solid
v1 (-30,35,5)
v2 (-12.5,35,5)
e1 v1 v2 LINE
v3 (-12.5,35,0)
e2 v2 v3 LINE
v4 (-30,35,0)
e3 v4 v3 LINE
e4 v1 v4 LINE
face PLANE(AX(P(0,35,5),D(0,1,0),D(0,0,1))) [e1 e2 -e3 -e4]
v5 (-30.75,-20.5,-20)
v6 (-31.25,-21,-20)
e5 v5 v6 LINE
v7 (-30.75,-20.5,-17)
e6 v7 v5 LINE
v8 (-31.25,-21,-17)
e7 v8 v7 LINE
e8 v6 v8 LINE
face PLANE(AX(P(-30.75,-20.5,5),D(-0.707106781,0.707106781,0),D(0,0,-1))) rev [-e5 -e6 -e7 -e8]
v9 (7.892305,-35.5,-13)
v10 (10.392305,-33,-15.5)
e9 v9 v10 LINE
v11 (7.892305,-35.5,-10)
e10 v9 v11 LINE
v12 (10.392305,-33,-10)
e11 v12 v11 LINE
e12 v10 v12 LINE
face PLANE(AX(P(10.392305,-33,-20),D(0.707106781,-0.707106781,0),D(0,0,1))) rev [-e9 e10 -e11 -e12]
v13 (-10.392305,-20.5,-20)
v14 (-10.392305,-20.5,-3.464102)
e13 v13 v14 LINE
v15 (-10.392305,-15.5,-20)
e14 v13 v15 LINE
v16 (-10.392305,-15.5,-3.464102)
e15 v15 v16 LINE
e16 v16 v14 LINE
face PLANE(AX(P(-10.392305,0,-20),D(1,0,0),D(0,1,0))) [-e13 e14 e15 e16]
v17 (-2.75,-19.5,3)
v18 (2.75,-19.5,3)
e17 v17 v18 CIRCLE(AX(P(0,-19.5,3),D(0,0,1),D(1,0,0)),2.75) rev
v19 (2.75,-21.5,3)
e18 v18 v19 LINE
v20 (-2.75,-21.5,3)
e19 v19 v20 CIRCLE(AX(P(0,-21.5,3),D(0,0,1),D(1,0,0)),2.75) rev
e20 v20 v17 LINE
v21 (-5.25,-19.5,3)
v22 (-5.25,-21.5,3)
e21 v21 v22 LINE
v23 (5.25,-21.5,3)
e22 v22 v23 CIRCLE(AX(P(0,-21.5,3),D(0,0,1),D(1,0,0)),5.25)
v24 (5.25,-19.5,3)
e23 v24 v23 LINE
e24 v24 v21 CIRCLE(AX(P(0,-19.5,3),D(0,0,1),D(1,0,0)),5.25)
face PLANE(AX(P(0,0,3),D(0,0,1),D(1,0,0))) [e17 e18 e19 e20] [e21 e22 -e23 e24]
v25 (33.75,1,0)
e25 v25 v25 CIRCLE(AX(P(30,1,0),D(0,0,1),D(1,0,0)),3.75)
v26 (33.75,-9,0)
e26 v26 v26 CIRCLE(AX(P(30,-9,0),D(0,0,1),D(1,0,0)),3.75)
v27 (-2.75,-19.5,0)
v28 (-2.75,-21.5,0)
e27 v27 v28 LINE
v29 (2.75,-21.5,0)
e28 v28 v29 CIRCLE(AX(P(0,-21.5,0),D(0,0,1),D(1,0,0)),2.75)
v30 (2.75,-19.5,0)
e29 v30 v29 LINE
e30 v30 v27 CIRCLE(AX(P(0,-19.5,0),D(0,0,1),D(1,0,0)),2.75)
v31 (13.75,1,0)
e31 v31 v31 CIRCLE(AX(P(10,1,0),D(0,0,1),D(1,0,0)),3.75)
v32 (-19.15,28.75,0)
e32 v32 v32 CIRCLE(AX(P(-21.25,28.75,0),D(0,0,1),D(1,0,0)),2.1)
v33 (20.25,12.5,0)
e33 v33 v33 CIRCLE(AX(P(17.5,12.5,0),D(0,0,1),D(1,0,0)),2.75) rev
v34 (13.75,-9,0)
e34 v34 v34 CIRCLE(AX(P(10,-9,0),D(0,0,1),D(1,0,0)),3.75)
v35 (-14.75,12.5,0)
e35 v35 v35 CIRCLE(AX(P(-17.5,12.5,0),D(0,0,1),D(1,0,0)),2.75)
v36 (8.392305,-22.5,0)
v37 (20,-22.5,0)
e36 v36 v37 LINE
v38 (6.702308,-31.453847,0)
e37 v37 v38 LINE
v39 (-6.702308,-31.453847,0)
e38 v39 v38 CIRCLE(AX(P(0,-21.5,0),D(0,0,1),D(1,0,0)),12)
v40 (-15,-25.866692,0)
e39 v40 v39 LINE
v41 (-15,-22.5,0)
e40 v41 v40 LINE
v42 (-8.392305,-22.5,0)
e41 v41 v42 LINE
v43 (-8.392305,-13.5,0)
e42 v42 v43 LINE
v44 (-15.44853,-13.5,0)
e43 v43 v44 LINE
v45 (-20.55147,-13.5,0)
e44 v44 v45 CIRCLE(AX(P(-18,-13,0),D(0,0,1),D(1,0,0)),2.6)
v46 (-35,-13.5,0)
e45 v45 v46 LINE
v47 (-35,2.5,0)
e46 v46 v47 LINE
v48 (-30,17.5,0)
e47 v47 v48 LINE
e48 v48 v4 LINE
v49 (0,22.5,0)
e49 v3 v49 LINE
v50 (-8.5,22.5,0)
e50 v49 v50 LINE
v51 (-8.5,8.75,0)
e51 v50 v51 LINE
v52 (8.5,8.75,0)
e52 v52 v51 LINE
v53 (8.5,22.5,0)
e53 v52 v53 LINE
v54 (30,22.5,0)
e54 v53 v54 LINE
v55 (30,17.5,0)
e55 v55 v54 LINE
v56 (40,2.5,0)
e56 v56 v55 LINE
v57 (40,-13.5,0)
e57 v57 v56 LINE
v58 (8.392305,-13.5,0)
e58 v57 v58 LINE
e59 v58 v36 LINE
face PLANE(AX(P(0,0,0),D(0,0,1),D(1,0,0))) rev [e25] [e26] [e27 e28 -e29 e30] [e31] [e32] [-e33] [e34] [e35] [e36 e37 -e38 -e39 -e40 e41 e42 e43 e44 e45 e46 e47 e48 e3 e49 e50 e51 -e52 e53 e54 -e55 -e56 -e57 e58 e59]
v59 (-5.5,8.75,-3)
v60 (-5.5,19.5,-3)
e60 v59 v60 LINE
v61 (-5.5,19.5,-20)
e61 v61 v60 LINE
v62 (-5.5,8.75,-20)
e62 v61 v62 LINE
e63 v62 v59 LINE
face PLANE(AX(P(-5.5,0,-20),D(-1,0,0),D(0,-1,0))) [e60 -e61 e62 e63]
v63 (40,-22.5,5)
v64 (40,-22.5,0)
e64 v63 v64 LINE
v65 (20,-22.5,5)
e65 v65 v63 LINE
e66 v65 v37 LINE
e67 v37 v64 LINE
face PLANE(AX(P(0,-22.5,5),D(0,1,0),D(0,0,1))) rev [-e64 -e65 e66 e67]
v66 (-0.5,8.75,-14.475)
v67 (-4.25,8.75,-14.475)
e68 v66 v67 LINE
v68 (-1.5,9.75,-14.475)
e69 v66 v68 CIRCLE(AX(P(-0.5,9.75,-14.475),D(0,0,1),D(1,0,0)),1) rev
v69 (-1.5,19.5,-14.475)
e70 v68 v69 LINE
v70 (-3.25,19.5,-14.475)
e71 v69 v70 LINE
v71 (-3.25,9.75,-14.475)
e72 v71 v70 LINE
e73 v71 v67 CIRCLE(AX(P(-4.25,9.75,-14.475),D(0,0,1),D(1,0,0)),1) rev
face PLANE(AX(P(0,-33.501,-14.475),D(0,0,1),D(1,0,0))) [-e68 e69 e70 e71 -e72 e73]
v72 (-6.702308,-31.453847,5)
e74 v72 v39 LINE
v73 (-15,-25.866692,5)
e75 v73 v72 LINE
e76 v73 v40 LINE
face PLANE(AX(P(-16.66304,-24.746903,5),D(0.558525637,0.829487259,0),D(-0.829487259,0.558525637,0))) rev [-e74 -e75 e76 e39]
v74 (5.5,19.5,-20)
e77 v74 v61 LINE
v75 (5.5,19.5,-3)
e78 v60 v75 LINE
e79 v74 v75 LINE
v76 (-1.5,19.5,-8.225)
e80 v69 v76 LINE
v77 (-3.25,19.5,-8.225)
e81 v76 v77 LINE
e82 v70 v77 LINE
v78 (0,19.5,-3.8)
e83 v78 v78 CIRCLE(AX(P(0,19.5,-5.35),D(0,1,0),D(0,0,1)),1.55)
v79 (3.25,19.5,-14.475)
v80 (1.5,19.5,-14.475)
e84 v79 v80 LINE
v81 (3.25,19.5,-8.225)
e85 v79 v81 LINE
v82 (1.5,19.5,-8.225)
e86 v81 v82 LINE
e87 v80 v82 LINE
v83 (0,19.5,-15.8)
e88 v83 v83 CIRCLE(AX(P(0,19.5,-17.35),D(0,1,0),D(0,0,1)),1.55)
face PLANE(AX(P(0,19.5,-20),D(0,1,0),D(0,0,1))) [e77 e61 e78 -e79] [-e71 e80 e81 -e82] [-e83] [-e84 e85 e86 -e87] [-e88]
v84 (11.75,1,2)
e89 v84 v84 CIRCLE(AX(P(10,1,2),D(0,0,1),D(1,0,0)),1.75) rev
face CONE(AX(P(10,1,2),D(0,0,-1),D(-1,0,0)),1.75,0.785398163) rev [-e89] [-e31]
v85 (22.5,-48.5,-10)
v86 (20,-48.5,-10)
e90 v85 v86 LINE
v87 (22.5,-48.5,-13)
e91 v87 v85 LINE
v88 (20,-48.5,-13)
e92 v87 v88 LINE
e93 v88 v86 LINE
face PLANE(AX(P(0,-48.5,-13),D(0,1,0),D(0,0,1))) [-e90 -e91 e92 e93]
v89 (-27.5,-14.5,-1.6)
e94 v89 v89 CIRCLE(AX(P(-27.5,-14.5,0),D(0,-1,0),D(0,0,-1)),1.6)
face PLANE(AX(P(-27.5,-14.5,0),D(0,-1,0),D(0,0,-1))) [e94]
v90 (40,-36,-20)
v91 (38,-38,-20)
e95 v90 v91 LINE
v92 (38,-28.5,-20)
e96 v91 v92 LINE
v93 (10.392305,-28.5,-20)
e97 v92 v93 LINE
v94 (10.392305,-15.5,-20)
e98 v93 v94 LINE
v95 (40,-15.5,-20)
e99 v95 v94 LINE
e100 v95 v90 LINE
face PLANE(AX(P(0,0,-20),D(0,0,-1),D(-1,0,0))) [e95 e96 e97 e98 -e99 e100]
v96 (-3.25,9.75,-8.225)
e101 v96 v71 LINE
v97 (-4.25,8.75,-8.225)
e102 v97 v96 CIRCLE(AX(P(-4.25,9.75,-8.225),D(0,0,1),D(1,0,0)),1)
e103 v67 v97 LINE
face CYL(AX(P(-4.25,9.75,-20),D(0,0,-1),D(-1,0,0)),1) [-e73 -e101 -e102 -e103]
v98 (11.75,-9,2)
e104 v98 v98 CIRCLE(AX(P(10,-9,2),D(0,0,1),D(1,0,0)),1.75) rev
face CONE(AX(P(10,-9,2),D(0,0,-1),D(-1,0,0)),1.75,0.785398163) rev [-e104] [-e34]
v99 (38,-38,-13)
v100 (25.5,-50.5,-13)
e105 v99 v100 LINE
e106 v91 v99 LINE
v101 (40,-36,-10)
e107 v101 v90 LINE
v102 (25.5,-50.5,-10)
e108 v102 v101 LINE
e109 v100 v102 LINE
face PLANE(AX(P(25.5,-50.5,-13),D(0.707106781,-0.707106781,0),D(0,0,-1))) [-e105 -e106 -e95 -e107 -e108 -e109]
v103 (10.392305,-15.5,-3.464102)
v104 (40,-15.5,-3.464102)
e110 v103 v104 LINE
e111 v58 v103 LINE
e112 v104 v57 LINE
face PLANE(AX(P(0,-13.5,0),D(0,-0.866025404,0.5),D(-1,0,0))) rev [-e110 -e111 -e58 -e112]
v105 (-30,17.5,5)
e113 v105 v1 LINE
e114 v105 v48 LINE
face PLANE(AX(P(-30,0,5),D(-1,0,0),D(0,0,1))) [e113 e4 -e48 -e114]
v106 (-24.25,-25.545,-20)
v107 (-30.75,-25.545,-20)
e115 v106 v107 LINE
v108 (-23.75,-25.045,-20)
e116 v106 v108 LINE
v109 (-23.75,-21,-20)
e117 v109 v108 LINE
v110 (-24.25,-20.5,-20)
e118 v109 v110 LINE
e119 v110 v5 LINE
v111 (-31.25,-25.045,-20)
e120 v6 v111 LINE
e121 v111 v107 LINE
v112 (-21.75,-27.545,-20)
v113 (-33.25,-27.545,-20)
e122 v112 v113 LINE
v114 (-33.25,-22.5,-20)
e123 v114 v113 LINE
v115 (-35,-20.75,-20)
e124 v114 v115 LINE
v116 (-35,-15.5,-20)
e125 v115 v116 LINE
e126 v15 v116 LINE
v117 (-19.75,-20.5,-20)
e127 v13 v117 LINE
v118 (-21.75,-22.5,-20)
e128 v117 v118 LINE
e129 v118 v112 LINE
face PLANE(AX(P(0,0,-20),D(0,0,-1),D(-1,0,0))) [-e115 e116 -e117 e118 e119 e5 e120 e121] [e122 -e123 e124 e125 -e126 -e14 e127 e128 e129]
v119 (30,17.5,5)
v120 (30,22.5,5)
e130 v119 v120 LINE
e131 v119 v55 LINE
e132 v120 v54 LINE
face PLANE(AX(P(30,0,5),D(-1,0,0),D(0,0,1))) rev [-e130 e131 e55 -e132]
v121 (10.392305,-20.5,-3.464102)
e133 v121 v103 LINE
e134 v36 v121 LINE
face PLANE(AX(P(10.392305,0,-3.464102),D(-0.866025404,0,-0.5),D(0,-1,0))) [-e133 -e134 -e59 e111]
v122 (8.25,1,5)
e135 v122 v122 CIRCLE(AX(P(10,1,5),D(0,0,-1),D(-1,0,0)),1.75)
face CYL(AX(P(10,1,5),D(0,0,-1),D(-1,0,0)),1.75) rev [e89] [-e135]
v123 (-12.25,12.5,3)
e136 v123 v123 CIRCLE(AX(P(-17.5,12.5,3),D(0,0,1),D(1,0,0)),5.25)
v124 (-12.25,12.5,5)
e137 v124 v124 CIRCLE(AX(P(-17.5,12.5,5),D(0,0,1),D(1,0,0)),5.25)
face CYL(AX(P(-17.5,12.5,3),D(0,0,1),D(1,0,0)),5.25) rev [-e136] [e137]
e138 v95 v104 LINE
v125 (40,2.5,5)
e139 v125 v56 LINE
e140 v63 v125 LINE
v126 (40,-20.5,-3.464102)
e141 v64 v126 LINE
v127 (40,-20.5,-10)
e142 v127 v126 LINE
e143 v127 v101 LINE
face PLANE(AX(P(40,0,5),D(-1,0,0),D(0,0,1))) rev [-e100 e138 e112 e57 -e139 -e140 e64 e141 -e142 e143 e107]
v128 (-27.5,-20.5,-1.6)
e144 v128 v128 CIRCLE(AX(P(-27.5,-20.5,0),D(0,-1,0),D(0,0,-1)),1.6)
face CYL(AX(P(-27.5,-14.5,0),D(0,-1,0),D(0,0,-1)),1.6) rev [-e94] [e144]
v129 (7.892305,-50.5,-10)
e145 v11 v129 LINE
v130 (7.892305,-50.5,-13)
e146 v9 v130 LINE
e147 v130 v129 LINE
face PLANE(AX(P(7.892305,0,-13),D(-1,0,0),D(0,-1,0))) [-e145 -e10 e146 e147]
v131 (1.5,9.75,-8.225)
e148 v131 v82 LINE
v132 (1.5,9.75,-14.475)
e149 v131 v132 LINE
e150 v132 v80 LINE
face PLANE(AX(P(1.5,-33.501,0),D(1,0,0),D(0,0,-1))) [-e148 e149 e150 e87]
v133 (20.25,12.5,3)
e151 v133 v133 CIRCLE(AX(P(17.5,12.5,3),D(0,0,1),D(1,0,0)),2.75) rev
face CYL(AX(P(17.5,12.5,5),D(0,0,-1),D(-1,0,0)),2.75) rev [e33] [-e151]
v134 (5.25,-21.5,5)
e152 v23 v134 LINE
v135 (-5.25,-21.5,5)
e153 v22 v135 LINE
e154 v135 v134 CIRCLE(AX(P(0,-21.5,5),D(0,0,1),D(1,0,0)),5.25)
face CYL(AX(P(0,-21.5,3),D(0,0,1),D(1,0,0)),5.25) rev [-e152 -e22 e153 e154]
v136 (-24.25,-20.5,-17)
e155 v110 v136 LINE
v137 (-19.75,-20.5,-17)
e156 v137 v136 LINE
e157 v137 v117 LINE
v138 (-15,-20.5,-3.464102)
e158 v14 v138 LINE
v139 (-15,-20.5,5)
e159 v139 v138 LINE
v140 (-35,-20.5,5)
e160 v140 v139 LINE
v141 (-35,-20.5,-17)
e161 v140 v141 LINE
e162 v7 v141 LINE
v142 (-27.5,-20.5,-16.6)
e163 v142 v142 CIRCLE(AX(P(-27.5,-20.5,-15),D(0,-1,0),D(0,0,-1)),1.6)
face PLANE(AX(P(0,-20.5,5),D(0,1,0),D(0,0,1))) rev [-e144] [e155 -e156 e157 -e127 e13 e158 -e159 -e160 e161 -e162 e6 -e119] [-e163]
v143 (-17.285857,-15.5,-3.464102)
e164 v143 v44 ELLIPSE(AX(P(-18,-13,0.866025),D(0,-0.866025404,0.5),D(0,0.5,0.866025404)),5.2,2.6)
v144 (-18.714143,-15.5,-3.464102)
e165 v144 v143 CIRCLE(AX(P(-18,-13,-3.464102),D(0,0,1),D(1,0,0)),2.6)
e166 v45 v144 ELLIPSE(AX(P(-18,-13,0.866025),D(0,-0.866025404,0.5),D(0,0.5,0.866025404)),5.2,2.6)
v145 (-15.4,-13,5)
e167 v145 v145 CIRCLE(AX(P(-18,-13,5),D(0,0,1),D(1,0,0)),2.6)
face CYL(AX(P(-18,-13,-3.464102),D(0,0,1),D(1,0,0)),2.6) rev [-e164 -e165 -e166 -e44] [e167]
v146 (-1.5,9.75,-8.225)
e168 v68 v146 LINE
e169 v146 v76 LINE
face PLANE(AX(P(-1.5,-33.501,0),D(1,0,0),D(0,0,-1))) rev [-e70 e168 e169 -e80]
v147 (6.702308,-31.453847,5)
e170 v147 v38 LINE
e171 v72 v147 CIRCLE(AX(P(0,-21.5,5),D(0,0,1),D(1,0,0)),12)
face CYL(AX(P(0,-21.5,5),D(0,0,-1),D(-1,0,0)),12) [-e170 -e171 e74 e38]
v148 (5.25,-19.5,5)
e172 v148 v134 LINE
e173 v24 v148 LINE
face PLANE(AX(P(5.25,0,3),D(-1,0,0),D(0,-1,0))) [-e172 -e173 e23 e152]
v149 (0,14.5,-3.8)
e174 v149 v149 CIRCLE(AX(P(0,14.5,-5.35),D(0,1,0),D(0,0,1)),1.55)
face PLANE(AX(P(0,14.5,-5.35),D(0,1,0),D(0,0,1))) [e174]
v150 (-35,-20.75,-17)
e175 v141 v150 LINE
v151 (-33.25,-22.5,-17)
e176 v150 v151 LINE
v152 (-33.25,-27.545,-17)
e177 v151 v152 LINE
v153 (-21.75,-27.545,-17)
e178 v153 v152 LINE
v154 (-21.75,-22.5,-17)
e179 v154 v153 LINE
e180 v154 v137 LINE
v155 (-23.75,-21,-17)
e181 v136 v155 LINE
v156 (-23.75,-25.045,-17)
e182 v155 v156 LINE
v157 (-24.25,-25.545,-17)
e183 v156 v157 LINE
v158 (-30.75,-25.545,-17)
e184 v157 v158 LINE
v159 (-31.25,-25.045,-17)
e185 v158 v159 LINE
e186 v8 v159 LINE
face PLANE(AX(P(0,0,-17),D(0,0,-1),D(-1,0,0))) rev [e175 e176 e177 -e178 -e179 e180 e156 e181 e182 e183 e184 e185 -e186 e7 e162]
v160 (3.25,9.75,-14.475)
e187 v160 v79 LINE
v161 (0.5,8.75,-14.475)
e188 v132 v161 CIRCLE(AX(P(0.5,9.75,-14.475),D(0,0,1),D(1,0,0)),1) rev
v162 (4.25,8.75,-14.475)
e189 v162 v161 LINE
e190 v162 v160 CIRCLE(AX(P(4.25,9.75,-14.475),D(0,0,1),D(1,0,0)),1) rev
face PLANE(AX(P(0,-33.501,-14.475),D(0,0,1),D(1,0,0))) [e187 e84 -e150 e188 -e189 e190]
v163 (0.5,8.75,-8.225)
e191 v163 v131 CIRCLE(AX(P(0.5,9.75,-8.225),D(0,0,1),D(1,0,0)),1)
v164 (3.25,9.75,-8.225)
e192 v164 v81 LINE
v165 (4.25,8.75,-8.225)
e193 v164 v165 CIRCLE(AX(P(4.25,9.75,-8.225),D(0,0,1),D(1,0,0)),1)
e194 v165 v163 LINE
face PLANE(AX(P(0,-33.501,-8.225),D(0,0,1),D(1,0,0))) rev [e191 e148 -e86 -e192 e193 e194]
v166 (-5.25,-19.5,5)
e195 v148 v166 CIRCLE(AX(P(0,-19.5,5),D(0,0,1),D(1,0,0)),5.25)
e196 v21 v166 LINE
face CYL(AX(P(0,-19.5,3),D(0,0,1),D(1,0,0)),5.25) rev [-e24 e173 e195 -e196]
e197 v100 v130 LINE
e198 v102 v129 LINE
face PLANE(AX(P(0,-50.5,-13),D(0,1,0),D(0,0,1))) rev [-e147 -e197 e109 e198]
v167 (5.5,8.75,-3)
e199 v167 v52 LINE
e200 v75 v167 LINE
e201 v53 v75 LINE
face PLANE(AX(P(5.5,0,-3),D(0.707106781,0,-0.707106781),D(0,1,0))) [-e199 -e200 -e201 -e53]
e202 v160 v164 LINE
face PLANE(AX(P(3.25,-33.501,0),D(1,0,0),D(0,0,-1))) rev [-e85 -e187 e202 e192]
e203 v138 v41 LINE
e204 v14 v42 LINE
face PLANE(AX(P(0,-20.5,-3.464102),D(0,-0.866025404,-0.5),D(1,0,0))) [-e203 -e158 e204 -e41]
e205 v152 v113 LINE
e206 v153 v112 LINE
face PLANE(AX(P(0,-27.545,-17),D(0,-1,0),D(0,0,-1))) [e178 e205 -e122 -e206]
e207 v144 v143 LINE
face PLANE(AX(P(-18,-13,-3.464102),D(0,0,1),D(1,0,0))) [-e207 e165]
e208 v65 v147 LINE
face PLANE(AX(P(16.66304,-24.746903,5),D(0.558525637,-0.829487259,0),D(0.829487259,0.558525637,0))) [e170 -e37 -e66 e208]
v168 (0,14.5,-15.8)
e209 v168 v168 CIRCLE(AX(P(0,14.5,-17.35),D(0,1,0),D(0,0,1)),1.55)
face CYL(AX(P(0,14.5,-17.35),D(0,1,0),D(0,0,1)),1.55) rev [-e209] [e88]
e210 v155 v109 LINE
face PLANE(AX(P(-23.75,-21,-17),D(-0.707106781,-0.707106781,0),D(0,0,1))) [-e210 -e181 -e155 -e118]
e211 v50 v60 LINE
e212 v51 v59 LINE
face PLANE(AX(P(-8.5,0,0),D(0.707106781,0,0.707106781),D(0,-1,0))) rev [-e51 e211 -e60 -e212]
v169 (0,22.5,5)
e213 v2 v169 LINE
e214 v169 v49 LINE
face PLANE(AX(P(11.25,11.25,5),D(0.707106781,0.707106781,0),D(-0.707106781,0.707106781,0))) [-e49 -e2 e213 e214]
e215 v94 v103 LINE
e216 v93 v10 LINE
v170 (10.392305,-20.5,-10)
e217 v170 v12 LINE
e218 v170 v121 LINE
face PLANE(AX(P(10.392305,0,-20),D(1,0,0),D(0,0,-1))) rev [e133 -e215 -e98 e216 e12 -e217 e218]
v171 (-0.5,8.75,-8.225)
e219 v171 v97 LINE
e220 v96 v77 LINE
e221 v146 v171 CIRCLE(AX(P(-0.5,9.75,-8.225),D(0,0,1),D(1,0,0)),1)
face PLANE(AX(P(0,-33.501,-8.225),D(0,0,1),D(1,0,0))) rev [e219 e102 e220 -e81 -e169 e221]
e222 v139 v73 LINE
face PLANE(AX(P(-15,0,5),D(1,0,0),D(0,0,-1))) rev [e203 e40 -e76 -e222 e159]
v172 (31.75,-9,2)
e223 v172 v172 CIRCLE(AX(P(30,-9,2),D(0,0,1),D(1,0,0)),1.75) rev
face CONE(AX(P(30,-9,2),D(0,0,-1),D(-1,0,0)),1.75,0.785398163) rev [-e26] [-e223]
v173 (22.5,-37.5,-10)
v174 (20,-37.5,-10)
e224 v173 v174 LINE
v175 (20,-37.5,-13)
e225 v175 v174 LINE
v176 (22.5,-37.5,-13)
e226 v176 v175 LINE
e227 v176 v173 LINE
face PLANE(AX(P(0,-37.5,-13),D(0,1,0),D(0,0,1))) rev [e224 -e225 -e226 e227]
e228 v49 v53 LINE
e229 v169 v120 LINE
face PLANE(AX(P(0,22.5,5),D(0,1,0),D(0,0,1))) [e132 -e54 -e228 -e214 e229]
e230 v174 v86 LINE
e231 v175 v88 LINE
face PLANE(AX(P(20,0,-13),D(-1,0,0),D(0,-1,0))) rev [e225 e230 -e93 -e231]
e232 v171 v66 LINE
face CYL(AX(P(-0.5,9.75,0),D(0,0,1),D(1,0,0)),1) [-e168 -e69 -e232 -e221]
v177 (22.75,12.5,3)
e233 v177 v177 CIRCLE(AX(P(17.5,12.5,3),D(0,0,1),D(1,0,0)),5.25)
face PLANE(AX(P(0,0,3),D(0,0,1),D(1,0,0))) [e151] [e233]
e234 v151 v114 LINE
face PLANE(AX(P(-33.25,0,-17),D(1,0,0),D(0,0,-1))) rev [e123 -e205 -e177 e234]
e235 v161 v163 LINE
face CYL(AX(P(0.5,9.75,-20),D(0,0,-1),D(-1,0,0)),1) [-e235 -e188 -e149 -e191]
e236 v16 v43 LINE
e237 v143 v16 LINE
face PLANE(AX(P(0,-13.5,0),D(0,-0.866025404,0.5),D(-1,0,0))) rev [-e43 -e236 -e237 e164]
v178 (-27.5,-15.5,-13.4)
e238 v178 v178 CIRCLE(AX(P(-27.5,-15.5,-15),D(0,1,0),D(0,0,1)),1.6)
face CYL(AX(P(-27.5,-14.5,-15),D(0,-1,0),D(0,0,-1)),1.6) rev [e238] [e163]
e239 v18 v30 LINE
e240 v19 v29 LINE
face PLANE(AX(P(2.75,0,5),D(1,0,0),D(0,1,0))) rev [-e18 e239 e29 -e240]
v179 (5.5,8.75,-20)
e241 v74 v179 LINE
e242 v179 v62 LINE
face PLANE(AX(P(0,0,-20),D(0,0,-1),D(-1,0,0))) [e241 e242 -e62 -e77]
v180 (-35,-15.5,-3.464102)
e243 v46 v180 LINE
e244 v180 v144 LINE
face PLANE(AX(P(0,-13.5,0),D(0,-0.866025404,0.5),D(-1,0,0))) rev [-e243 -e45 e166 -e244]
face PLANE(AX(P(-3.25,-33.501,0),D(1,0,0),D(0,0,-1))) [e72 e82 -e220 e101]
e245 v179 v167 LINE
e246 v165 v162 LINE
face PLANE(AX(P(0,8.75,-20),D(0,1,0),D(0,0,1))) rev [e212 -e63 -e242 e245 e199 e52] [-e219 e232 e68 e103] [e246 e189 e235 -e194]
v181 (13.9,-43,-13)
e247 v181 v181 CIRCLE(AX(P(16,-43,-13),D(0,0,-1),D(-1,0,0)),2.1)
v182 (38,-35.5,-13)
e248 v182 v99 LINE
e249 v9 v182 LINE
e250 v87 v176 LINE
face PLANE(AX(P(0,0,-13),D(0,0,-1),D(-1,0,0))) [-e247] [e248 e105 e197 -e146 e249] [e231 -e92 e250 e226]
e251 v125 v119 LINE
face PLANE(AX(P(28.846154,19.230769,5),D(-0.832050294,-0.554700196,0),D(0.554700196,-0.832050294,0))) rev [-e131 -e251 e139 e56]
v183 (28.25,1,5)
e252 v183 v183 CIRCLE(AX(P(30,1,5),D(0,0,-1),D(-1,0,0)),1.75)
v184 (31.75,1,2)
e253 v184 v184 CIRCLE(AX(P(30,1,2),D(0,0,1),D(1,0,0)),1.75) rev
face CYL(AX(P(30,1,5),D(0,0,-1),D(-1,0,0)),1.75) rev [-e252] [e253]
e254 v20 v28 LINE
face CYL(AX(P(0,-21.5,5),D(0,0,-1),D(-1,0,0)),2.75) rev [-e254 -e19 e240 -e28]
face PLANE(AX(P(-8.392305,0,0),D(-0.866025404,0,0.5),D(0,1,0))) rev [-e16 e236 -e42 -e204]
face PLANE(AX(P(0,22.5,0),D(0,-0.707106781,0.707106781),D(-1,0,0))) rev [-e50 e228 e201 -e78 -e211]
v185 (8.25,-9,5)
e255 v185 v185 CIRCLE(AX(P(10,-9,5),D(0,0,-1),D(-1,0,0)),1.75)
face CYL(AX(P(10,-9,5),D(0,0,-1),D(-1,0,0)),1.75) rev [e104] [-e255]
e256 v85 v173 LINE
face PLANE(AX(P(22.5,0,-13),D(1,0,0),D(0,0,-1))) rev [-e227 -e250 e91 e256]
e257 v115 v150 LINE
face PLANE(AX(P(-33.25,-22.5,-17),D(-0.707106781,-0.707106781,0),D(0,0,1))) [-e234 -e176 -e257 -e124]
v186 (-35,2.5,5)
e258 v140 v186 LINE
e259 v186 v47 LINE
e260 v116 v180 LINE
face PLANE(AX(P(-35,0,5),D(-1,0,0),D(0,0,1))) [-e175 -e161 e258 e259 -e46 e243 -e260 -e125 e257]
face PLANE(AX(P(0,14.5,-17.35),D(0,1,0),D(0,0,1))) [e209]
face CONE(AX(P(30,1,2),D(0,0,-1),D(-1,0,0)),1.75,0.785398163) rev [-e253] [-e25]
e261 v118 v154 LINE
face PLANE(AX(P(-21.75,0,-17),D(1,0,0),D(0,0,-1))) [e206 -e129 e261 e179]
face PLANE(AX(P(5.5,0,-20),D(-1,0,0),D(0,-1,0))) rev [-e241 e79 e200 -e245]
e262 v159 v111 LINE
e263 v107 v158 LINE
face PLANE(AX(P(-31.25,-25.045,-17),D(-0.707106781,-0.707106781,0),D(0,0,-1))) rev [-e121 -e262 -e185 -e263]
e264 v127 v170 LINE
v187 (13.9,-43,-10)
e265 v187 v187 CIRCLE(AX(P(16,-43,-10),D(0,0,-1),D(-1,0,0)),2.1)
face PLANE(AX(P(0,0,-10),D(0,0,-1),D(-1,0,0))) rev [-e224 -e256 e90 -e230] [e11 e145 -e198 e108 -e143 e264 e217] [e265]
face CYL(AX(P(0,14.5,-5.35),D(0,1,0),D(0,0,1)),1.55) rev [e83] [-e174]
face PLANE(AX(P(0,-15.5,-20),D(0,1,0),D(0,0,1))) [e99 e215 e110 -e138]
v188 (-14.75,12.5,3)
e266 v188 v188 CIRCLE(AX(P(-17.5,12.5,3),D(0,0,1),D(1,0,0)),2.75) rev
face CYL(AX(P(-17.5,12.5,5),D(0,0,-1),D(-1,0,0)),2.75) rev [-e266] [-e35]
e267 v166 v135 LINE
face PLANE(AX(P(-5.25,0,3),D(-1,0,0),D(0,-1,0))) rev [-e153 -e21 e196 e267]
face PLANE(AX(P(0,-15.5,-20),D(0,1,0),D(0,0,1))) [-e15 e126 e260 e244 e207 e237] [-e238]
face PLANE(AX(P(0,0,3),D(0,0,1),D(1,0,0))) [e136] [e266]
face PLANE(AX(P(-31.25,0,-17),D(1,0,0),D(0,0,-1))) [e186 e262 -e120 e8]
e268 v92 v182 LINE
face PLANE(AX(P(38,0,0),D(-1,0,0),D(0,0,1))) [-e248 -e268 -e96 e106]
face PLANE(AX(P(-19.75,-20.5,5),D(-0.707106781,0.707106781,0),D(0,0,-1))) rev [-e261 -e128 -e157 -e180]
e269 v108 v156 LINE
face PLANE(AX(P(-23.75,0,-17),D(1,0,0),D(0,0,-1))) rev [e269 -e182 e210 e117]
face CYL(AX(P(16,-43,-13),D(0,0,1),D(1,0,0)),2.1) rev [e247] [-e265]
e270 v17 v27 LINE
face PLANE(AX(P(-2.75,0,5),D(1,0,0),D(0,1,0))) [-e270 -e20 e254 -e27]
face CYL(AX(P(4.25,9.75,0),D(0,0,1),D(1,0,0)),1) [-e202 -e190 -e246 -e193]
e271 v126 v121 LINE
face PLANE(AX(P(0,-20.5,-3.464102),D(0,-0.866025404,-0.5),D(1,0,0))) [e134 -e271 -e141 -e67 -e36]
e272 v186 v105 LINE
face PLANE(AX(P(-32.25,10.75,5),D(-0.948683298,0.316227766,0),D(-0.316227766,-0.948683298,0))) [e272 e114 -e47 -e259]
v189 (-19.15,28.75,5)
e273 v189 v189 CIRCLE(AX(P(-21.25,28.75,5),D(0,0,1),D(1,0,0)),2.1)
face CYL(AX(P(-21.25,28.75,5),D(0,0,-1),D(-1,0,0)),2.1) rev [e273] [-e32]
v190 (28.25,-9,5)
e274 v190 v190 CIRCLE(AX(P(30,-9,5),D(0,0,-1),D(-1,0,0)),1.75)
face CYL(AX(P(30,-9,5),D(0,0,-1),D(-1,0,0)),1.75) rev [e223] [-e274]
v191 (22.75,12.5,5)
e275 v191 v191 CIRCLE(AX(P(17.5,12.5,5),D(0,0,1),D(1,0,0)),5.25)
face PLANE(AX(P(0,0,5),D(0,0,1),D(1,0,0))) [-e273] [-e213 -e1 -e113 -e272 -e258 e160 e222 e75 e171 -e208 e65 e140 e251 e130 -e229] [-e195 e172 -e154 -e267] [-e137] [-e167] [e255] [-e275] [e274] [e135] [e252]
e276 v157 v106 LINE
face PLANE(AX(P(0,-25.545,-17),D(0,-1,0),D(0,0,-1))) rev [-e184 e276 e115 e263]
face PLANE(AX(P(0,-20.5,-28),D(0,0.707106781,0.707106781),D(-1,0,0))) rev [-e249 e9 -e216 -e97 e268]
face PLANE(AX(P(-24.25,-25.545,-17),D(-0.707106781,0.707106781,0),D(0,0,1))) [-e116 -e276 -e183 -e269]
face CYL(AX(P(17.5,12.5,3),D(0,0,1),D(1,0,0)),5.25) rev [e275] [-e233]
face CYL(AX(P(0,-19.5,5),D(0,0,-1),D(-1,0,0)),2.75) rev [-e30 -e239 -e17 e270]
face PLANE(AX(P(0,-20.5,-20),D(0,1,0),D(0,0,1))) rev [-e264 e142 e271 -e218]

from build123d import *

# Parameters (mm, degrees)
SKETCH_1_R          = 2.75
SKETCH_1_R_2        = 2.1
EXTRUDE_1_DEPTH     = 5
EXTRUDE_START       = 20
SKETCH_2_W          = 11
SKETCH_2_H          = 10.75
EXTRUDE_2_DEPTH     = 20
CHAMFER_1_SIZE      = 2
CHAMFER_1_SIZE2     = 3.464101615
CUT_EXTRUDE_START   = -2
SKETCH_8_R          = 5.25
SKETCH_8_R_2        = 2.75
CUT_EXTRUDE_3_DEPTH = 2
CUT_EXTRUDE_4_REACH = 73.666
SKETCH_9_W          = 1.75
SKETCH_9_H          = 6.25
SKETCH_10_R         = 1.55
CUT_EXTRUDE_5_DEPTH = 8
FILLET_1_R          = 1
CHAMFER_2_SIZE      = 3
SKETCH_11_R         = 1.6
CUT_EXTRUDE_6_DEPTH = 6
EXTRUDE_3_DEPTH     = 3
CHAMFER_3_SIZE      = 2
CHAMFER_4_SIZE      = 0.5
CHAMFER_5_SIZE      = 0.5
EXTRUDE_START_2     = -10
SKETCH_14_W         = 2.5
SKETCH_14_H         = 11
SKETCH_14_R         = 2.1
EXTRUDE_4_DEPTH     = 3
CHAMFER_6_SIZE      = 15
SKETCH_16_R         = 2.6
CUT_EXTRUDE_8_DEPTH = 8.4641
SKETCH_17_R         = 1.75
CUT_EXTRUDE_9_DEPTH = 68.455540914
CHAMFER_7_SIZE      = 2
SKETCH_18_W         = 7
SKETCH_18_H         = 15
EXTRUDE_5_DEPTH     = 2
CHAMFER_9_SIZE      = 2.5
CHAMFER_10_SIZE     = 15


# Some blends are built 0.0001 mm under size
with BuildPart() as part:
    # Эскиз1 → Бобышка-Вытянуть1 (new body)
    with BuildSketch(Plane.XY):
        with BuildLine():
            ThreePointArc((-6.702307645, -31.453847107), (0, -33.5), (6.702307645, -31.453847107))
            Line((6.702307645, -31.453847107), (20, -22.5))
            Line((20, -22.5), (40, -22.5))
            Line((40, -22.5), (40, 2.5))
            Line((40, 2.5), (30, 17.5))
            Line((30, 17.5), (30, 22.5))
            Line((30, 22.5), (0, 22.5))
            Line((0, 22.5), (-12.5, 35))
            Line((-12.5, 35), (-30, 35))
            Line((-30, 35), (-30, 17.5))
            Line((-30, 17.5), (-35, 2.5))
            Line((-35, 2.5), (-35, -20.5))
            Line((-35, -20.5), (-15, -20.5))
            Line((-15, -20.5), (-15, -25.86669208))
            Line((-15, -25.86669208), (-6.702307645, -31.453847107))
        make_face()
        with BuildLine():
            Line((-2.75, -21.5), (-2.75, -19.5))
            ThreePointArc((-2.75, -19.5), (0, -16.75), (2.75, -19.5))
            Line((2.75, -19.5), (2.75, -21.5))
            ThreePointArc((2.75, -21.5), (0, -24.25), (-2.75, -21.5))
        make_face(mode=Mode.SUBTRACT)
        with Locations((-17.5, 12.5)):
            Circle(SKETCH_1_R, mode=Mode.SUBTRACT)
        with Locations((-21.25, 28.75)):
            Circle(SKETCH_1_R_2, mode=Mode.SUBTRACT)
        with Locations((17.5, 12.5)):
            Circle(SKETCH_1_R, mode=Mode.SUBTRACT)
    extrude(amount=EXTRUDE_1_DEPTH)

    # Эскиз2 → Бобышка-Вытянуть2 (add)
    with BuildSketch(Plane(origin=(0, 0, 0), x_dir=(-1, 0, 0), z_dir=(0, 0, -1)).offset(EXTRUDE_START)):
        with Locations((0, 14.125)):
            Rectangle(SKETCH_2_W, SKETCH_2_H)
        with BuildLine():
            Line((35, -15.5), (10.392304845, -15.5))
            ThreePointArc((10.392304845, -15.5), (11.451504073, -17.913489932), (11.958260743, -20.5))
            Line((11.958260743, -20.5), (15, -20.5))
            Line((15, -20.5), (35, -20.5))
            Line((35, -20.5), (35, -15.5))
        make_face()
        with BuildLine():
            ThreePointArc((11.958260743, -20.5), (11.451504073, -17.913489932), (10.392304845, -15.5))
            Line((10.392304845, -15.5), (10.392304845, -20.5))
            Line((10.392304845, -20.5), (11.958260743, -20.5))
        make_face()
        with BuildLine():
            Line((-10.392304845, -20.5), (-10.392304845, -15.5))
            ThreePointArc((-10.392304845, -15.5), (-11.451504073, -17.913489932), (-11.958260743, -20.5))
            Line((-11.958260743, -20.5), (-10.392304845, -20.5))
        make_face()
        with BuildLine():
            Line((-10.392304845, -15.5), (-40, -15.5))
            Line((-40, -15.5), (-40, -20.5))
            Line((-40, -20.5), (-11.958260743, -20.5))
            ThreePointArc((-11.958260743, -20.5), (-11.451504073, -17.913489932), (-10.392304845, -15.5))
        make_face()
    extrude(amount=-EXTRUDE_2_DEPTH)

    # Фаска1
    chamfer_1_edges = [part.edges().sort_by_distance(p)[0] for p in [
        (10.392304845, -18, 0),
        (25.196152423, -20.5, 0),
        (25.196152423, -15.5, 0),
        (-12.696152423, -20.5, 0),
        (-22.696152423, -15.5, 0),
        (-10.392304845, -18, 0),
    ]]
    chamfer_1_side = [part.faces().sort_by_distance(p)[0] for p in [
        (0.373325122, 0.80452147, 0),
    ]]
    chamfer(chamfer_1_edges, length=CHAMFER_1_SIZE, length2=CHAMFER_1_SIZE2, reference=chamfer_1_side[0])

    # Эскиз8 → Вырез-Вытянуть3 (cut)
    # profile 1 of 3: a face of its own
    with BuildSketch(Plane.XY.offset(5).offset(CUT_EXTRUDE_START)):
        with BuildLine():
            ThreePointArc((-5.25, -21.5), (0, -26.75), (5.25, -21.5))
            Line((5.25, -21.5), (5.25, -19.5))
            ThreePointArc((5.25, -19.5), (0, -14.25), (-5.25, -19.5))
            Line((-5.25, -19.5), (-5.25, -21.5))
        make_face()
        with BuildLine():
            Line((2.75, -19.5), (2.75, -21.5))
            ThreePointArc((2.75, -21.5), (0, -24.25), (-2.75, -21.5))
            Line((-2.75, -21.5), (-2.75, -19.5))
            ThreePointArc((-2.75, -19.5), (0, -16.75), (2.75, -19.5))
        make_face(mode=Mode.SUBTRACT)
    # profile 2 of 3: a face of its own
    with BuildSketch(Plane.XY.offset(5).offset(CUT_EXTRUDE_START)):
        with Locations((-17.5, 12.5)):
            Circle(SKETCH_8_R)
        with Locations((-17.5, 12.5)):
            Circle(SKETCH_8_R_2, mode=Mode.SUBTRACT)
    # profile 3 of 3: a face of its own
    with BuildSketch(Plane.XY.offset(5).offset(CUT_EXTRUDE_START)):
        with Locations((17.5, 12.5)):
            Circle(SKETCH_8_R)
        with Locations((17.5, 12.5)):
            Circle(SKETCH_8_R_2, mode=Mode.SUBTRACT)
    extrude(amount=CUT_EXTRUDE_3_DEPTH, mode=Mode.SUBTRACT)

    # Эскиз9 → Вырез-Вытянуть4 (cut, up to next)
    with BuildSketch(Plane(origin=(0, 22.5, 0), x_dir=(1, 0, 0), z_dir=(0, 1, 0)), mode=Mode.PRIVATE) as cut_extrude_4_sk1:
        with Locations((-2.375, 11.35)):
            Rectangle(SKETCH_9_W, SKETCH_9_H)
    cut_extrude_4_tool1 = extrude(cut_extrude_4_sk1.sketch, amount=-CUT_EXTRUDE_4_REACH, mode=Mode.PRIVATE) & part.part
    # Эскиз9 → Вырез-Вытянуть4 (cut, up to next)
    with BuildSketch(Plane(origin=(0, 22.5, 0), x_dir=(1, 0, 0), z_dir=(0, 1, 0)), mode=Mode.PRIVATE) as cut_extrude_4_sk2:
        with Locations((2.375, 11.35)):
            Rectangle(SKETCH_9_W, SKETCH_9_H)
    cut_extrude_4_tool2 = extrude(cut_extrude_4_sk2.sketch, amount=-CUT_EXTRUDE_4_REACH, mode=Mode.PRIVATE) & part.part
    add(cut_extrude_4_tool1.solids().sort_by_distance((-2.375, 22.5, -11.35))[0], mode=Mode.SUBTRACT)
    add(cut_extrude_4_tool2.solids().sort_by_distance((2.375, 22.5, -11.35))[0], mode=Mode.SUBTRACT)

    # Эскиз10 → Вырез-Вытянуть5 (cut)
    with BuildSketch(Plane(origin=(0, 22.5, 0), x_dir=(1, 0, 0), z_dir=(0, 1, 0))):
        with Locations(Location((0, 17.35, 0), (0, 0, 270))):
            Circle(SKETCH_10_R)
        with Locations(Location((0, 5.35, 0), (0, 0, 270))):
            Circle(SKETCH_10_R)
    extrude(amount=-CUT_EXTRUDE_5_DEPTH, mode=Mode.SUBTRACT)

    # Скругление1
    fillet_1_edges = [part.edges().sort_by_distance(p)[0] for p in [
        (-3.25, 8.75, -11.35),
        (-1.5, 8.75, -11.35),
        (3.25, 8.75, -11.35),
        (1.5, 8.75, -11.35),
    ]]
    fillet(fillet_1_edges, radius=FILLET_1_R)

    # Фаска2
    chamfer_2_edges = [part.edges().sort_by_distance(p)[0] for p in [
        (5.5, 14.125, 0),
        (-5.5, 14.125, 0),
        (0, 19.5, 0),
    ]]
    chamfer(chamfer_2_edges, length=CHAMFER_2_SIZE - 0.0001)  # a hair under: the kernel refuses the full size

    # Эскиз11 → Вырез-Вытянуть6 (cut)
    with BuildSketch(Plane.XZ.offset(20.5)):
        with Locations(Location((-27.5, -15, 0), (0, 0, 270))):
            Circle(SKETCH_11_R)
        with Locations(Location((-27.5, 0, 0), (0, 0, 270))):
            Circle(SKETCH_11_R)
    extrude(amount=-CUT_EXTRUDE_6_DEPTH, mode=Mode.SUBTRACT)

    # Эскиз12 → Бобышка-Вытянуть3 (add)
    with BuildSketch(Plane(origin=(0, 0, -20), x_dir=(-1, 0, 0), z_dir=(0, 0, -1))):
        Polygon((23.75, -25.545), (23.75, -20.5), (21.75, -20.5), (21.75, -27.545), (33.25, -27.545), (33.25, -20.5), (31.25, -20.5), (31.25, -25.545), align=None)
    extrude(amount=-EXTRUDE_3_DEPTH)

    # Фаска3
    # the kernel refuses this chamfer: 2 mm, written as the material it adds along each edge
    with BuildSketch(Plane(origin=(-33.25, -20.5, -20), x_dir=(-0.9996219169112968, 0.027495876610585647, 0), z_dir=(0, 0, 1))) as chamfer_3_piece_1_section:
        Polygon((CHAMFER_3_SIZE * 0.999621916911, CHAMFER_3_SIZE * 0.0274958766106), (-CHAMFER_3_SIZE * 0.0274958766106, CHAMFER_3_SIZE * 0.999621916911), (0, 0), align=None)
    chamfer_3_piece_1 = extrude(amount=3, mode=Mode.PRIVATE)
    chamfer_3_piece_1 = split(chamfer_3_piece_1, bisect_by=Plane(origin=(-35, -21.175979667, -18.5), z_dir=(1, 0, 0)), keep=Keep.TOP, mode=Mode.PRIVATE)
    add(chamfer_3_piece_1)
    with BuildSketch(Plane(origin=(-21.75, -20.5, -20), x_dir=(0.9996219169112968, 0.027495876610585647, 0), z_dir=(0, 0, 1))) as chamfer_3_piece_2:
        Polygon((CHAMFER_3_SIZE * 0.999621916911, -CHAMFER_3_SIZE * 0.0274958766106), (-CHAMFER_3_SIZE * 0.0274958766106, -CHAMFER_3_SIZE * 0.999621916911), (0, 0), align=None)
    extrude(amount=3)

    # Фаска4
    chamfer_4_edges = [part.edges().sort_by_distance(p)[0] for p in [
        (-23.75, -20.5, -18.5),
        (-31.25, -20.5, -18.5),
    ]]
    chamfer(chamfer_4_edges, length=CHAMFER_4_SIZE)

    # Фаска5
    chamfer_5_edges = [part.edges().sort_by_distance(p)[0] for p in [
        (-23.75, -25.545, -18.5),
        (-31.25, -25.545, -18.5),
    ]]
    chamfer(chamfer_5_edges, length=CHAMFER_5_SIZE)

    # Эскиз14 → Бобышка-Вытянуть4 (add)
    with BuildSketch(Plane(origin=(0, 0, -20), x_dir=(-1, 0, 0), z_dir=(0, 0, -1)).offset(EXTRUDE_START_2)):
        Polygon((-40, -20.5), (-40, -35.5), (-25.5, -35.5), (-25.5, -50.5), (-7.892304845, -50.5), (-7.892304845, -35.5), (-10.392304845, -35.5), (-10.392304845, -20.5), align=None)
        with Locations((-21.25, -43)):
            Rectangle(SKETCH_14_W, SKETCH_14_H, mode=Mode.SUBTRACT)
        with Locations((-16, -43)):
            Circle(SKETCH_14_R, mode=Mode.SUBTRACT)
    extrude(amount=EXTRUDE_4_DEPTH)

    # Фаска6
    # the kernel refuses this chamfer: 15 mm, written as the material it adds along each edge
    with BuildSketch(Plane(origin=(10.392304845, -20.5, -13), x_dir=(0, 0.027495876610586303, -0.9996219169112966), z_dir=(1, 0, 0))) as chamfer_6_piece_1_section:
        Polygon((CHAMFER_6_SIZE * 0.999621916911, -CHAMFER_6_SIZE * 0.0274958766106), (-CHAMFER_6_SIZE * 0.0274958766106, -CHAMFER_6_SIZE * 0.999621916911), (0, 0), align=None)
    chamfer_6_piece_1 = extrude(amount=29.607695155, mode=Mode.PRIVATE)
    chamfer_6_piece_1 = split(chamfer_6_piece_1, bisect_by=Plane(origin=(17.946152423, -26.478099439, -20), z_dir=(0, 0, 1)), keep=Keep.TOP, mode=Mode.PRIVATE)
    chamfer_6_piece_1 = split(chamfer_6_piece_1, bisect_by=Plane(origin=(25.5, -26.478099439, -15.943264036), z_dir=(-1, 0, 0)), keep=Keep.TOP, mode=Mode.PRIVATE)
    chamfer_6_piece_1 = split(chamfer_6_piece_1, bisect_by=Plane(origin=(17.946152423, -35.5, -15.943264036), z_dir=(0, 1, 0)), keep=Keep.TOP, mode=Mode.PRIVATE)
    add(chamfer_6_piece_1)
    with BuildSketch(Plane(origin=(10.392304845, -20.5, -13), x_dir=(0, 0.027495876610586303, -0.9996219169112966), z_dir=(1, 0, 0))) as chamfer_6_piece_2_section:
        Polygon((CHAMFER_6_SIZE * 0.999621916911, -CHAMFER_6_SIZE * 0.0274958766106), (-CHAMFER_6_SIZE * 0.0274958766106, -CHAMFER_6_SIZE * 0.999621916911), (0, 0), align=None)
    chamfer_6_piece_2 = extrude(amount=29.607695155, mode=Mode.PRIVATE)
    chamfer_6_piece_2 = split(chamfer_6_piece_2, bisect_by=Plane(origin=(32.75, -26.478099439, -20), z_dir=(0, 0, 1)), keep=Keep.TOP, mode=Mode.PRIVATE)
    chamfer_6_piece_2 = split(chamfer_6_piece_2, bisect_by=Plane(origin=(25.5, -26.478099439, -15.943264036), z_dir=(1, 0, 0)), keep=Keep.TOP, mode=Mode.PRIVATE)
    chamfer_6_piece_2 = split(chamfer_6_piece_2, bisect_by=Plane(origin=(32.75, -35.5, -15.943264036), z_dir=(0, 1, 0)), keep=Keep.TOP, mode=Mode.PRIVATE)
    add(chamfer_6_piece_2)

    # Эскиз16 → Вырез-Вытянуть8 (cut)
    with BuildSketch(Plane.XY.offset(5)):
        with Locations((-18, -13)):
            Circle(SKETCH_16_R)
    extrude(amount=-CUT_EXTRUDE_8_DEPTH, mode=Mode.SUBTRACT)

    # Эскиз17 → Вырез-Вытянуть9 (cut, through all)
    with BuildSketch(Plane(origin=(0, 0, 0), x_dir=(-1, 0, 0), z_dir=(0, 0, -1))):
        with Locations((-30, 1)):
            Circle(SKETCH_17_R)
        with Locations((-10, 1)):
            Circle(SKETCH_17_R)
        with Locations((-10, -9)):
            Circle(SKETCH_17_R)
        with Locations((-30, -9)):
            Circle(SKETCH_17_R)
    extrude(amount=-CUT_EXTRUDE_9_DEPTH, mode=Mode.SUBTRACT)

    # Фаска7
    chamfer_7_edges = [part.edges().sort_by_distance(p)[0] for p in [
        (31.75, -9, 0),
        (11.75, -9, 0),
        (11.75, 1, 0),
        (31.75, 1, 0),
    ]]
    chamfer(chamfer_7_edges, length=CHAMFER_7_SIZE)

    # Эскиз18 → Бобышка-Вытянуть5 (add)
    with BuildSketch(Plane(origin=(40, 0, 0), x_dir=(0, 0, -1), z_dir=(1, 0, 0))):
        with Locations((16.5, -28)):
            Rectangle(SKETCH_18_W, SKETCH_18_H)
    extrude(amount=-EXTRUDE_5_DEPTH)

    # Фаска9
    chamfer_9_edges = [part.edges().sort_by_distance(p)[0] for p in [
        (10.392304845, -35.5, -11.5),
    ]]
    chamfer(chamfer_9_edges, length=CHAMFER_9_SIZE - 0.0001)  # a hair under: the kernel refuses the full size

    # Фаска10
    # the kernel refuses this chamfer: 15 mm, written as the material it adds along each edge
    with BuildSketch(Plane(origin=(25.5, -35.5, -10), x_dir=(0.9996219169112968, 0.02749587661058632, 0), z_dir=(0, 0, -1))) as chamfer_10_piece_1_section:
        Polygon((CHAMFER_10_SIZE * 0.999621916911, CHAMFER_10_SIZE * 0.0274958766106), (-CHAMFER_10_SIZE * 0.0274958766106, CHAMFER_10_SIZE * 0.999621916911), (0, 0), align=None)
    chamfer_10_piece_1 = extrude(amount=3, mode=Mode.PRIVATE)
    chamfer_10_piece_1 = split(chamfer_10_piece_1, bisect_by=Plane(origin=(40, -36.201298701, -11.149350649), z_dir=(-1, 0, 0)), keep=Keep.TOP, mode=Mode.PRIVATE)
    add(chamfer_10_piece_1)
    with BuildSketch(Plane(origin=(25.5, -35.5, 28.575244819), x_dir=(0.9996219169112968, 0.02749587661058632, 0), z_dir=(0, 0, -1))) as chamfer_10_piece_2_section:
        Polygon((CHAMFER_10_SIZE * 0.999621916911, CHAMFER_10_SIZE * 0.0274958766106), (-CHAMFER_10_SIZE * 0.0274958766106, CHAMFER_10_SIZE * 0.999621916911), (0, 0), align=None)
    chamfer_10_piece_2 = extrude(amount=80.150489639, mode=Mode.PRIVATE)
    chamfer_10_piece_2 = split(chamfer_10_piece_2, bisect_by=Plane(origin=(38.777777778, -34.180555556, -14.319444444), z_dir=(0, -0.7071067811862648, -0.7071067811868302)), keep=Keep.TOP, mode=Mode.PRIVATE)
    chamfer_10_piece_2 = split(chamfer_10_piece_2, bisect_by=Plane(origin=(38, -36.361111111, -16.5), z_dir=(1, 0, 0)), keep=Keep.TOP, mode=Mode.PRIVATE)
    chamfer_10_piece_2 = split(chamfer_10_piece_2, bisect_by=Plane(origin=(38.777777778, -36.361111111, -20), z_dir=(0, 0, 1)), keep=Keep.TOP, mode=Mode.PRIVATE)
    chamfer_10_piece_2 = split(chamfer_10_piece_2, bisect_by=Plane(origin=(40, -36.361111111, -16.5), z_dir=(-1, 0, 0)), keep=Keep.TOP, mode=Mode.PRIVATE)
    add(chamfer_10_piece_2)


solid = part.part
